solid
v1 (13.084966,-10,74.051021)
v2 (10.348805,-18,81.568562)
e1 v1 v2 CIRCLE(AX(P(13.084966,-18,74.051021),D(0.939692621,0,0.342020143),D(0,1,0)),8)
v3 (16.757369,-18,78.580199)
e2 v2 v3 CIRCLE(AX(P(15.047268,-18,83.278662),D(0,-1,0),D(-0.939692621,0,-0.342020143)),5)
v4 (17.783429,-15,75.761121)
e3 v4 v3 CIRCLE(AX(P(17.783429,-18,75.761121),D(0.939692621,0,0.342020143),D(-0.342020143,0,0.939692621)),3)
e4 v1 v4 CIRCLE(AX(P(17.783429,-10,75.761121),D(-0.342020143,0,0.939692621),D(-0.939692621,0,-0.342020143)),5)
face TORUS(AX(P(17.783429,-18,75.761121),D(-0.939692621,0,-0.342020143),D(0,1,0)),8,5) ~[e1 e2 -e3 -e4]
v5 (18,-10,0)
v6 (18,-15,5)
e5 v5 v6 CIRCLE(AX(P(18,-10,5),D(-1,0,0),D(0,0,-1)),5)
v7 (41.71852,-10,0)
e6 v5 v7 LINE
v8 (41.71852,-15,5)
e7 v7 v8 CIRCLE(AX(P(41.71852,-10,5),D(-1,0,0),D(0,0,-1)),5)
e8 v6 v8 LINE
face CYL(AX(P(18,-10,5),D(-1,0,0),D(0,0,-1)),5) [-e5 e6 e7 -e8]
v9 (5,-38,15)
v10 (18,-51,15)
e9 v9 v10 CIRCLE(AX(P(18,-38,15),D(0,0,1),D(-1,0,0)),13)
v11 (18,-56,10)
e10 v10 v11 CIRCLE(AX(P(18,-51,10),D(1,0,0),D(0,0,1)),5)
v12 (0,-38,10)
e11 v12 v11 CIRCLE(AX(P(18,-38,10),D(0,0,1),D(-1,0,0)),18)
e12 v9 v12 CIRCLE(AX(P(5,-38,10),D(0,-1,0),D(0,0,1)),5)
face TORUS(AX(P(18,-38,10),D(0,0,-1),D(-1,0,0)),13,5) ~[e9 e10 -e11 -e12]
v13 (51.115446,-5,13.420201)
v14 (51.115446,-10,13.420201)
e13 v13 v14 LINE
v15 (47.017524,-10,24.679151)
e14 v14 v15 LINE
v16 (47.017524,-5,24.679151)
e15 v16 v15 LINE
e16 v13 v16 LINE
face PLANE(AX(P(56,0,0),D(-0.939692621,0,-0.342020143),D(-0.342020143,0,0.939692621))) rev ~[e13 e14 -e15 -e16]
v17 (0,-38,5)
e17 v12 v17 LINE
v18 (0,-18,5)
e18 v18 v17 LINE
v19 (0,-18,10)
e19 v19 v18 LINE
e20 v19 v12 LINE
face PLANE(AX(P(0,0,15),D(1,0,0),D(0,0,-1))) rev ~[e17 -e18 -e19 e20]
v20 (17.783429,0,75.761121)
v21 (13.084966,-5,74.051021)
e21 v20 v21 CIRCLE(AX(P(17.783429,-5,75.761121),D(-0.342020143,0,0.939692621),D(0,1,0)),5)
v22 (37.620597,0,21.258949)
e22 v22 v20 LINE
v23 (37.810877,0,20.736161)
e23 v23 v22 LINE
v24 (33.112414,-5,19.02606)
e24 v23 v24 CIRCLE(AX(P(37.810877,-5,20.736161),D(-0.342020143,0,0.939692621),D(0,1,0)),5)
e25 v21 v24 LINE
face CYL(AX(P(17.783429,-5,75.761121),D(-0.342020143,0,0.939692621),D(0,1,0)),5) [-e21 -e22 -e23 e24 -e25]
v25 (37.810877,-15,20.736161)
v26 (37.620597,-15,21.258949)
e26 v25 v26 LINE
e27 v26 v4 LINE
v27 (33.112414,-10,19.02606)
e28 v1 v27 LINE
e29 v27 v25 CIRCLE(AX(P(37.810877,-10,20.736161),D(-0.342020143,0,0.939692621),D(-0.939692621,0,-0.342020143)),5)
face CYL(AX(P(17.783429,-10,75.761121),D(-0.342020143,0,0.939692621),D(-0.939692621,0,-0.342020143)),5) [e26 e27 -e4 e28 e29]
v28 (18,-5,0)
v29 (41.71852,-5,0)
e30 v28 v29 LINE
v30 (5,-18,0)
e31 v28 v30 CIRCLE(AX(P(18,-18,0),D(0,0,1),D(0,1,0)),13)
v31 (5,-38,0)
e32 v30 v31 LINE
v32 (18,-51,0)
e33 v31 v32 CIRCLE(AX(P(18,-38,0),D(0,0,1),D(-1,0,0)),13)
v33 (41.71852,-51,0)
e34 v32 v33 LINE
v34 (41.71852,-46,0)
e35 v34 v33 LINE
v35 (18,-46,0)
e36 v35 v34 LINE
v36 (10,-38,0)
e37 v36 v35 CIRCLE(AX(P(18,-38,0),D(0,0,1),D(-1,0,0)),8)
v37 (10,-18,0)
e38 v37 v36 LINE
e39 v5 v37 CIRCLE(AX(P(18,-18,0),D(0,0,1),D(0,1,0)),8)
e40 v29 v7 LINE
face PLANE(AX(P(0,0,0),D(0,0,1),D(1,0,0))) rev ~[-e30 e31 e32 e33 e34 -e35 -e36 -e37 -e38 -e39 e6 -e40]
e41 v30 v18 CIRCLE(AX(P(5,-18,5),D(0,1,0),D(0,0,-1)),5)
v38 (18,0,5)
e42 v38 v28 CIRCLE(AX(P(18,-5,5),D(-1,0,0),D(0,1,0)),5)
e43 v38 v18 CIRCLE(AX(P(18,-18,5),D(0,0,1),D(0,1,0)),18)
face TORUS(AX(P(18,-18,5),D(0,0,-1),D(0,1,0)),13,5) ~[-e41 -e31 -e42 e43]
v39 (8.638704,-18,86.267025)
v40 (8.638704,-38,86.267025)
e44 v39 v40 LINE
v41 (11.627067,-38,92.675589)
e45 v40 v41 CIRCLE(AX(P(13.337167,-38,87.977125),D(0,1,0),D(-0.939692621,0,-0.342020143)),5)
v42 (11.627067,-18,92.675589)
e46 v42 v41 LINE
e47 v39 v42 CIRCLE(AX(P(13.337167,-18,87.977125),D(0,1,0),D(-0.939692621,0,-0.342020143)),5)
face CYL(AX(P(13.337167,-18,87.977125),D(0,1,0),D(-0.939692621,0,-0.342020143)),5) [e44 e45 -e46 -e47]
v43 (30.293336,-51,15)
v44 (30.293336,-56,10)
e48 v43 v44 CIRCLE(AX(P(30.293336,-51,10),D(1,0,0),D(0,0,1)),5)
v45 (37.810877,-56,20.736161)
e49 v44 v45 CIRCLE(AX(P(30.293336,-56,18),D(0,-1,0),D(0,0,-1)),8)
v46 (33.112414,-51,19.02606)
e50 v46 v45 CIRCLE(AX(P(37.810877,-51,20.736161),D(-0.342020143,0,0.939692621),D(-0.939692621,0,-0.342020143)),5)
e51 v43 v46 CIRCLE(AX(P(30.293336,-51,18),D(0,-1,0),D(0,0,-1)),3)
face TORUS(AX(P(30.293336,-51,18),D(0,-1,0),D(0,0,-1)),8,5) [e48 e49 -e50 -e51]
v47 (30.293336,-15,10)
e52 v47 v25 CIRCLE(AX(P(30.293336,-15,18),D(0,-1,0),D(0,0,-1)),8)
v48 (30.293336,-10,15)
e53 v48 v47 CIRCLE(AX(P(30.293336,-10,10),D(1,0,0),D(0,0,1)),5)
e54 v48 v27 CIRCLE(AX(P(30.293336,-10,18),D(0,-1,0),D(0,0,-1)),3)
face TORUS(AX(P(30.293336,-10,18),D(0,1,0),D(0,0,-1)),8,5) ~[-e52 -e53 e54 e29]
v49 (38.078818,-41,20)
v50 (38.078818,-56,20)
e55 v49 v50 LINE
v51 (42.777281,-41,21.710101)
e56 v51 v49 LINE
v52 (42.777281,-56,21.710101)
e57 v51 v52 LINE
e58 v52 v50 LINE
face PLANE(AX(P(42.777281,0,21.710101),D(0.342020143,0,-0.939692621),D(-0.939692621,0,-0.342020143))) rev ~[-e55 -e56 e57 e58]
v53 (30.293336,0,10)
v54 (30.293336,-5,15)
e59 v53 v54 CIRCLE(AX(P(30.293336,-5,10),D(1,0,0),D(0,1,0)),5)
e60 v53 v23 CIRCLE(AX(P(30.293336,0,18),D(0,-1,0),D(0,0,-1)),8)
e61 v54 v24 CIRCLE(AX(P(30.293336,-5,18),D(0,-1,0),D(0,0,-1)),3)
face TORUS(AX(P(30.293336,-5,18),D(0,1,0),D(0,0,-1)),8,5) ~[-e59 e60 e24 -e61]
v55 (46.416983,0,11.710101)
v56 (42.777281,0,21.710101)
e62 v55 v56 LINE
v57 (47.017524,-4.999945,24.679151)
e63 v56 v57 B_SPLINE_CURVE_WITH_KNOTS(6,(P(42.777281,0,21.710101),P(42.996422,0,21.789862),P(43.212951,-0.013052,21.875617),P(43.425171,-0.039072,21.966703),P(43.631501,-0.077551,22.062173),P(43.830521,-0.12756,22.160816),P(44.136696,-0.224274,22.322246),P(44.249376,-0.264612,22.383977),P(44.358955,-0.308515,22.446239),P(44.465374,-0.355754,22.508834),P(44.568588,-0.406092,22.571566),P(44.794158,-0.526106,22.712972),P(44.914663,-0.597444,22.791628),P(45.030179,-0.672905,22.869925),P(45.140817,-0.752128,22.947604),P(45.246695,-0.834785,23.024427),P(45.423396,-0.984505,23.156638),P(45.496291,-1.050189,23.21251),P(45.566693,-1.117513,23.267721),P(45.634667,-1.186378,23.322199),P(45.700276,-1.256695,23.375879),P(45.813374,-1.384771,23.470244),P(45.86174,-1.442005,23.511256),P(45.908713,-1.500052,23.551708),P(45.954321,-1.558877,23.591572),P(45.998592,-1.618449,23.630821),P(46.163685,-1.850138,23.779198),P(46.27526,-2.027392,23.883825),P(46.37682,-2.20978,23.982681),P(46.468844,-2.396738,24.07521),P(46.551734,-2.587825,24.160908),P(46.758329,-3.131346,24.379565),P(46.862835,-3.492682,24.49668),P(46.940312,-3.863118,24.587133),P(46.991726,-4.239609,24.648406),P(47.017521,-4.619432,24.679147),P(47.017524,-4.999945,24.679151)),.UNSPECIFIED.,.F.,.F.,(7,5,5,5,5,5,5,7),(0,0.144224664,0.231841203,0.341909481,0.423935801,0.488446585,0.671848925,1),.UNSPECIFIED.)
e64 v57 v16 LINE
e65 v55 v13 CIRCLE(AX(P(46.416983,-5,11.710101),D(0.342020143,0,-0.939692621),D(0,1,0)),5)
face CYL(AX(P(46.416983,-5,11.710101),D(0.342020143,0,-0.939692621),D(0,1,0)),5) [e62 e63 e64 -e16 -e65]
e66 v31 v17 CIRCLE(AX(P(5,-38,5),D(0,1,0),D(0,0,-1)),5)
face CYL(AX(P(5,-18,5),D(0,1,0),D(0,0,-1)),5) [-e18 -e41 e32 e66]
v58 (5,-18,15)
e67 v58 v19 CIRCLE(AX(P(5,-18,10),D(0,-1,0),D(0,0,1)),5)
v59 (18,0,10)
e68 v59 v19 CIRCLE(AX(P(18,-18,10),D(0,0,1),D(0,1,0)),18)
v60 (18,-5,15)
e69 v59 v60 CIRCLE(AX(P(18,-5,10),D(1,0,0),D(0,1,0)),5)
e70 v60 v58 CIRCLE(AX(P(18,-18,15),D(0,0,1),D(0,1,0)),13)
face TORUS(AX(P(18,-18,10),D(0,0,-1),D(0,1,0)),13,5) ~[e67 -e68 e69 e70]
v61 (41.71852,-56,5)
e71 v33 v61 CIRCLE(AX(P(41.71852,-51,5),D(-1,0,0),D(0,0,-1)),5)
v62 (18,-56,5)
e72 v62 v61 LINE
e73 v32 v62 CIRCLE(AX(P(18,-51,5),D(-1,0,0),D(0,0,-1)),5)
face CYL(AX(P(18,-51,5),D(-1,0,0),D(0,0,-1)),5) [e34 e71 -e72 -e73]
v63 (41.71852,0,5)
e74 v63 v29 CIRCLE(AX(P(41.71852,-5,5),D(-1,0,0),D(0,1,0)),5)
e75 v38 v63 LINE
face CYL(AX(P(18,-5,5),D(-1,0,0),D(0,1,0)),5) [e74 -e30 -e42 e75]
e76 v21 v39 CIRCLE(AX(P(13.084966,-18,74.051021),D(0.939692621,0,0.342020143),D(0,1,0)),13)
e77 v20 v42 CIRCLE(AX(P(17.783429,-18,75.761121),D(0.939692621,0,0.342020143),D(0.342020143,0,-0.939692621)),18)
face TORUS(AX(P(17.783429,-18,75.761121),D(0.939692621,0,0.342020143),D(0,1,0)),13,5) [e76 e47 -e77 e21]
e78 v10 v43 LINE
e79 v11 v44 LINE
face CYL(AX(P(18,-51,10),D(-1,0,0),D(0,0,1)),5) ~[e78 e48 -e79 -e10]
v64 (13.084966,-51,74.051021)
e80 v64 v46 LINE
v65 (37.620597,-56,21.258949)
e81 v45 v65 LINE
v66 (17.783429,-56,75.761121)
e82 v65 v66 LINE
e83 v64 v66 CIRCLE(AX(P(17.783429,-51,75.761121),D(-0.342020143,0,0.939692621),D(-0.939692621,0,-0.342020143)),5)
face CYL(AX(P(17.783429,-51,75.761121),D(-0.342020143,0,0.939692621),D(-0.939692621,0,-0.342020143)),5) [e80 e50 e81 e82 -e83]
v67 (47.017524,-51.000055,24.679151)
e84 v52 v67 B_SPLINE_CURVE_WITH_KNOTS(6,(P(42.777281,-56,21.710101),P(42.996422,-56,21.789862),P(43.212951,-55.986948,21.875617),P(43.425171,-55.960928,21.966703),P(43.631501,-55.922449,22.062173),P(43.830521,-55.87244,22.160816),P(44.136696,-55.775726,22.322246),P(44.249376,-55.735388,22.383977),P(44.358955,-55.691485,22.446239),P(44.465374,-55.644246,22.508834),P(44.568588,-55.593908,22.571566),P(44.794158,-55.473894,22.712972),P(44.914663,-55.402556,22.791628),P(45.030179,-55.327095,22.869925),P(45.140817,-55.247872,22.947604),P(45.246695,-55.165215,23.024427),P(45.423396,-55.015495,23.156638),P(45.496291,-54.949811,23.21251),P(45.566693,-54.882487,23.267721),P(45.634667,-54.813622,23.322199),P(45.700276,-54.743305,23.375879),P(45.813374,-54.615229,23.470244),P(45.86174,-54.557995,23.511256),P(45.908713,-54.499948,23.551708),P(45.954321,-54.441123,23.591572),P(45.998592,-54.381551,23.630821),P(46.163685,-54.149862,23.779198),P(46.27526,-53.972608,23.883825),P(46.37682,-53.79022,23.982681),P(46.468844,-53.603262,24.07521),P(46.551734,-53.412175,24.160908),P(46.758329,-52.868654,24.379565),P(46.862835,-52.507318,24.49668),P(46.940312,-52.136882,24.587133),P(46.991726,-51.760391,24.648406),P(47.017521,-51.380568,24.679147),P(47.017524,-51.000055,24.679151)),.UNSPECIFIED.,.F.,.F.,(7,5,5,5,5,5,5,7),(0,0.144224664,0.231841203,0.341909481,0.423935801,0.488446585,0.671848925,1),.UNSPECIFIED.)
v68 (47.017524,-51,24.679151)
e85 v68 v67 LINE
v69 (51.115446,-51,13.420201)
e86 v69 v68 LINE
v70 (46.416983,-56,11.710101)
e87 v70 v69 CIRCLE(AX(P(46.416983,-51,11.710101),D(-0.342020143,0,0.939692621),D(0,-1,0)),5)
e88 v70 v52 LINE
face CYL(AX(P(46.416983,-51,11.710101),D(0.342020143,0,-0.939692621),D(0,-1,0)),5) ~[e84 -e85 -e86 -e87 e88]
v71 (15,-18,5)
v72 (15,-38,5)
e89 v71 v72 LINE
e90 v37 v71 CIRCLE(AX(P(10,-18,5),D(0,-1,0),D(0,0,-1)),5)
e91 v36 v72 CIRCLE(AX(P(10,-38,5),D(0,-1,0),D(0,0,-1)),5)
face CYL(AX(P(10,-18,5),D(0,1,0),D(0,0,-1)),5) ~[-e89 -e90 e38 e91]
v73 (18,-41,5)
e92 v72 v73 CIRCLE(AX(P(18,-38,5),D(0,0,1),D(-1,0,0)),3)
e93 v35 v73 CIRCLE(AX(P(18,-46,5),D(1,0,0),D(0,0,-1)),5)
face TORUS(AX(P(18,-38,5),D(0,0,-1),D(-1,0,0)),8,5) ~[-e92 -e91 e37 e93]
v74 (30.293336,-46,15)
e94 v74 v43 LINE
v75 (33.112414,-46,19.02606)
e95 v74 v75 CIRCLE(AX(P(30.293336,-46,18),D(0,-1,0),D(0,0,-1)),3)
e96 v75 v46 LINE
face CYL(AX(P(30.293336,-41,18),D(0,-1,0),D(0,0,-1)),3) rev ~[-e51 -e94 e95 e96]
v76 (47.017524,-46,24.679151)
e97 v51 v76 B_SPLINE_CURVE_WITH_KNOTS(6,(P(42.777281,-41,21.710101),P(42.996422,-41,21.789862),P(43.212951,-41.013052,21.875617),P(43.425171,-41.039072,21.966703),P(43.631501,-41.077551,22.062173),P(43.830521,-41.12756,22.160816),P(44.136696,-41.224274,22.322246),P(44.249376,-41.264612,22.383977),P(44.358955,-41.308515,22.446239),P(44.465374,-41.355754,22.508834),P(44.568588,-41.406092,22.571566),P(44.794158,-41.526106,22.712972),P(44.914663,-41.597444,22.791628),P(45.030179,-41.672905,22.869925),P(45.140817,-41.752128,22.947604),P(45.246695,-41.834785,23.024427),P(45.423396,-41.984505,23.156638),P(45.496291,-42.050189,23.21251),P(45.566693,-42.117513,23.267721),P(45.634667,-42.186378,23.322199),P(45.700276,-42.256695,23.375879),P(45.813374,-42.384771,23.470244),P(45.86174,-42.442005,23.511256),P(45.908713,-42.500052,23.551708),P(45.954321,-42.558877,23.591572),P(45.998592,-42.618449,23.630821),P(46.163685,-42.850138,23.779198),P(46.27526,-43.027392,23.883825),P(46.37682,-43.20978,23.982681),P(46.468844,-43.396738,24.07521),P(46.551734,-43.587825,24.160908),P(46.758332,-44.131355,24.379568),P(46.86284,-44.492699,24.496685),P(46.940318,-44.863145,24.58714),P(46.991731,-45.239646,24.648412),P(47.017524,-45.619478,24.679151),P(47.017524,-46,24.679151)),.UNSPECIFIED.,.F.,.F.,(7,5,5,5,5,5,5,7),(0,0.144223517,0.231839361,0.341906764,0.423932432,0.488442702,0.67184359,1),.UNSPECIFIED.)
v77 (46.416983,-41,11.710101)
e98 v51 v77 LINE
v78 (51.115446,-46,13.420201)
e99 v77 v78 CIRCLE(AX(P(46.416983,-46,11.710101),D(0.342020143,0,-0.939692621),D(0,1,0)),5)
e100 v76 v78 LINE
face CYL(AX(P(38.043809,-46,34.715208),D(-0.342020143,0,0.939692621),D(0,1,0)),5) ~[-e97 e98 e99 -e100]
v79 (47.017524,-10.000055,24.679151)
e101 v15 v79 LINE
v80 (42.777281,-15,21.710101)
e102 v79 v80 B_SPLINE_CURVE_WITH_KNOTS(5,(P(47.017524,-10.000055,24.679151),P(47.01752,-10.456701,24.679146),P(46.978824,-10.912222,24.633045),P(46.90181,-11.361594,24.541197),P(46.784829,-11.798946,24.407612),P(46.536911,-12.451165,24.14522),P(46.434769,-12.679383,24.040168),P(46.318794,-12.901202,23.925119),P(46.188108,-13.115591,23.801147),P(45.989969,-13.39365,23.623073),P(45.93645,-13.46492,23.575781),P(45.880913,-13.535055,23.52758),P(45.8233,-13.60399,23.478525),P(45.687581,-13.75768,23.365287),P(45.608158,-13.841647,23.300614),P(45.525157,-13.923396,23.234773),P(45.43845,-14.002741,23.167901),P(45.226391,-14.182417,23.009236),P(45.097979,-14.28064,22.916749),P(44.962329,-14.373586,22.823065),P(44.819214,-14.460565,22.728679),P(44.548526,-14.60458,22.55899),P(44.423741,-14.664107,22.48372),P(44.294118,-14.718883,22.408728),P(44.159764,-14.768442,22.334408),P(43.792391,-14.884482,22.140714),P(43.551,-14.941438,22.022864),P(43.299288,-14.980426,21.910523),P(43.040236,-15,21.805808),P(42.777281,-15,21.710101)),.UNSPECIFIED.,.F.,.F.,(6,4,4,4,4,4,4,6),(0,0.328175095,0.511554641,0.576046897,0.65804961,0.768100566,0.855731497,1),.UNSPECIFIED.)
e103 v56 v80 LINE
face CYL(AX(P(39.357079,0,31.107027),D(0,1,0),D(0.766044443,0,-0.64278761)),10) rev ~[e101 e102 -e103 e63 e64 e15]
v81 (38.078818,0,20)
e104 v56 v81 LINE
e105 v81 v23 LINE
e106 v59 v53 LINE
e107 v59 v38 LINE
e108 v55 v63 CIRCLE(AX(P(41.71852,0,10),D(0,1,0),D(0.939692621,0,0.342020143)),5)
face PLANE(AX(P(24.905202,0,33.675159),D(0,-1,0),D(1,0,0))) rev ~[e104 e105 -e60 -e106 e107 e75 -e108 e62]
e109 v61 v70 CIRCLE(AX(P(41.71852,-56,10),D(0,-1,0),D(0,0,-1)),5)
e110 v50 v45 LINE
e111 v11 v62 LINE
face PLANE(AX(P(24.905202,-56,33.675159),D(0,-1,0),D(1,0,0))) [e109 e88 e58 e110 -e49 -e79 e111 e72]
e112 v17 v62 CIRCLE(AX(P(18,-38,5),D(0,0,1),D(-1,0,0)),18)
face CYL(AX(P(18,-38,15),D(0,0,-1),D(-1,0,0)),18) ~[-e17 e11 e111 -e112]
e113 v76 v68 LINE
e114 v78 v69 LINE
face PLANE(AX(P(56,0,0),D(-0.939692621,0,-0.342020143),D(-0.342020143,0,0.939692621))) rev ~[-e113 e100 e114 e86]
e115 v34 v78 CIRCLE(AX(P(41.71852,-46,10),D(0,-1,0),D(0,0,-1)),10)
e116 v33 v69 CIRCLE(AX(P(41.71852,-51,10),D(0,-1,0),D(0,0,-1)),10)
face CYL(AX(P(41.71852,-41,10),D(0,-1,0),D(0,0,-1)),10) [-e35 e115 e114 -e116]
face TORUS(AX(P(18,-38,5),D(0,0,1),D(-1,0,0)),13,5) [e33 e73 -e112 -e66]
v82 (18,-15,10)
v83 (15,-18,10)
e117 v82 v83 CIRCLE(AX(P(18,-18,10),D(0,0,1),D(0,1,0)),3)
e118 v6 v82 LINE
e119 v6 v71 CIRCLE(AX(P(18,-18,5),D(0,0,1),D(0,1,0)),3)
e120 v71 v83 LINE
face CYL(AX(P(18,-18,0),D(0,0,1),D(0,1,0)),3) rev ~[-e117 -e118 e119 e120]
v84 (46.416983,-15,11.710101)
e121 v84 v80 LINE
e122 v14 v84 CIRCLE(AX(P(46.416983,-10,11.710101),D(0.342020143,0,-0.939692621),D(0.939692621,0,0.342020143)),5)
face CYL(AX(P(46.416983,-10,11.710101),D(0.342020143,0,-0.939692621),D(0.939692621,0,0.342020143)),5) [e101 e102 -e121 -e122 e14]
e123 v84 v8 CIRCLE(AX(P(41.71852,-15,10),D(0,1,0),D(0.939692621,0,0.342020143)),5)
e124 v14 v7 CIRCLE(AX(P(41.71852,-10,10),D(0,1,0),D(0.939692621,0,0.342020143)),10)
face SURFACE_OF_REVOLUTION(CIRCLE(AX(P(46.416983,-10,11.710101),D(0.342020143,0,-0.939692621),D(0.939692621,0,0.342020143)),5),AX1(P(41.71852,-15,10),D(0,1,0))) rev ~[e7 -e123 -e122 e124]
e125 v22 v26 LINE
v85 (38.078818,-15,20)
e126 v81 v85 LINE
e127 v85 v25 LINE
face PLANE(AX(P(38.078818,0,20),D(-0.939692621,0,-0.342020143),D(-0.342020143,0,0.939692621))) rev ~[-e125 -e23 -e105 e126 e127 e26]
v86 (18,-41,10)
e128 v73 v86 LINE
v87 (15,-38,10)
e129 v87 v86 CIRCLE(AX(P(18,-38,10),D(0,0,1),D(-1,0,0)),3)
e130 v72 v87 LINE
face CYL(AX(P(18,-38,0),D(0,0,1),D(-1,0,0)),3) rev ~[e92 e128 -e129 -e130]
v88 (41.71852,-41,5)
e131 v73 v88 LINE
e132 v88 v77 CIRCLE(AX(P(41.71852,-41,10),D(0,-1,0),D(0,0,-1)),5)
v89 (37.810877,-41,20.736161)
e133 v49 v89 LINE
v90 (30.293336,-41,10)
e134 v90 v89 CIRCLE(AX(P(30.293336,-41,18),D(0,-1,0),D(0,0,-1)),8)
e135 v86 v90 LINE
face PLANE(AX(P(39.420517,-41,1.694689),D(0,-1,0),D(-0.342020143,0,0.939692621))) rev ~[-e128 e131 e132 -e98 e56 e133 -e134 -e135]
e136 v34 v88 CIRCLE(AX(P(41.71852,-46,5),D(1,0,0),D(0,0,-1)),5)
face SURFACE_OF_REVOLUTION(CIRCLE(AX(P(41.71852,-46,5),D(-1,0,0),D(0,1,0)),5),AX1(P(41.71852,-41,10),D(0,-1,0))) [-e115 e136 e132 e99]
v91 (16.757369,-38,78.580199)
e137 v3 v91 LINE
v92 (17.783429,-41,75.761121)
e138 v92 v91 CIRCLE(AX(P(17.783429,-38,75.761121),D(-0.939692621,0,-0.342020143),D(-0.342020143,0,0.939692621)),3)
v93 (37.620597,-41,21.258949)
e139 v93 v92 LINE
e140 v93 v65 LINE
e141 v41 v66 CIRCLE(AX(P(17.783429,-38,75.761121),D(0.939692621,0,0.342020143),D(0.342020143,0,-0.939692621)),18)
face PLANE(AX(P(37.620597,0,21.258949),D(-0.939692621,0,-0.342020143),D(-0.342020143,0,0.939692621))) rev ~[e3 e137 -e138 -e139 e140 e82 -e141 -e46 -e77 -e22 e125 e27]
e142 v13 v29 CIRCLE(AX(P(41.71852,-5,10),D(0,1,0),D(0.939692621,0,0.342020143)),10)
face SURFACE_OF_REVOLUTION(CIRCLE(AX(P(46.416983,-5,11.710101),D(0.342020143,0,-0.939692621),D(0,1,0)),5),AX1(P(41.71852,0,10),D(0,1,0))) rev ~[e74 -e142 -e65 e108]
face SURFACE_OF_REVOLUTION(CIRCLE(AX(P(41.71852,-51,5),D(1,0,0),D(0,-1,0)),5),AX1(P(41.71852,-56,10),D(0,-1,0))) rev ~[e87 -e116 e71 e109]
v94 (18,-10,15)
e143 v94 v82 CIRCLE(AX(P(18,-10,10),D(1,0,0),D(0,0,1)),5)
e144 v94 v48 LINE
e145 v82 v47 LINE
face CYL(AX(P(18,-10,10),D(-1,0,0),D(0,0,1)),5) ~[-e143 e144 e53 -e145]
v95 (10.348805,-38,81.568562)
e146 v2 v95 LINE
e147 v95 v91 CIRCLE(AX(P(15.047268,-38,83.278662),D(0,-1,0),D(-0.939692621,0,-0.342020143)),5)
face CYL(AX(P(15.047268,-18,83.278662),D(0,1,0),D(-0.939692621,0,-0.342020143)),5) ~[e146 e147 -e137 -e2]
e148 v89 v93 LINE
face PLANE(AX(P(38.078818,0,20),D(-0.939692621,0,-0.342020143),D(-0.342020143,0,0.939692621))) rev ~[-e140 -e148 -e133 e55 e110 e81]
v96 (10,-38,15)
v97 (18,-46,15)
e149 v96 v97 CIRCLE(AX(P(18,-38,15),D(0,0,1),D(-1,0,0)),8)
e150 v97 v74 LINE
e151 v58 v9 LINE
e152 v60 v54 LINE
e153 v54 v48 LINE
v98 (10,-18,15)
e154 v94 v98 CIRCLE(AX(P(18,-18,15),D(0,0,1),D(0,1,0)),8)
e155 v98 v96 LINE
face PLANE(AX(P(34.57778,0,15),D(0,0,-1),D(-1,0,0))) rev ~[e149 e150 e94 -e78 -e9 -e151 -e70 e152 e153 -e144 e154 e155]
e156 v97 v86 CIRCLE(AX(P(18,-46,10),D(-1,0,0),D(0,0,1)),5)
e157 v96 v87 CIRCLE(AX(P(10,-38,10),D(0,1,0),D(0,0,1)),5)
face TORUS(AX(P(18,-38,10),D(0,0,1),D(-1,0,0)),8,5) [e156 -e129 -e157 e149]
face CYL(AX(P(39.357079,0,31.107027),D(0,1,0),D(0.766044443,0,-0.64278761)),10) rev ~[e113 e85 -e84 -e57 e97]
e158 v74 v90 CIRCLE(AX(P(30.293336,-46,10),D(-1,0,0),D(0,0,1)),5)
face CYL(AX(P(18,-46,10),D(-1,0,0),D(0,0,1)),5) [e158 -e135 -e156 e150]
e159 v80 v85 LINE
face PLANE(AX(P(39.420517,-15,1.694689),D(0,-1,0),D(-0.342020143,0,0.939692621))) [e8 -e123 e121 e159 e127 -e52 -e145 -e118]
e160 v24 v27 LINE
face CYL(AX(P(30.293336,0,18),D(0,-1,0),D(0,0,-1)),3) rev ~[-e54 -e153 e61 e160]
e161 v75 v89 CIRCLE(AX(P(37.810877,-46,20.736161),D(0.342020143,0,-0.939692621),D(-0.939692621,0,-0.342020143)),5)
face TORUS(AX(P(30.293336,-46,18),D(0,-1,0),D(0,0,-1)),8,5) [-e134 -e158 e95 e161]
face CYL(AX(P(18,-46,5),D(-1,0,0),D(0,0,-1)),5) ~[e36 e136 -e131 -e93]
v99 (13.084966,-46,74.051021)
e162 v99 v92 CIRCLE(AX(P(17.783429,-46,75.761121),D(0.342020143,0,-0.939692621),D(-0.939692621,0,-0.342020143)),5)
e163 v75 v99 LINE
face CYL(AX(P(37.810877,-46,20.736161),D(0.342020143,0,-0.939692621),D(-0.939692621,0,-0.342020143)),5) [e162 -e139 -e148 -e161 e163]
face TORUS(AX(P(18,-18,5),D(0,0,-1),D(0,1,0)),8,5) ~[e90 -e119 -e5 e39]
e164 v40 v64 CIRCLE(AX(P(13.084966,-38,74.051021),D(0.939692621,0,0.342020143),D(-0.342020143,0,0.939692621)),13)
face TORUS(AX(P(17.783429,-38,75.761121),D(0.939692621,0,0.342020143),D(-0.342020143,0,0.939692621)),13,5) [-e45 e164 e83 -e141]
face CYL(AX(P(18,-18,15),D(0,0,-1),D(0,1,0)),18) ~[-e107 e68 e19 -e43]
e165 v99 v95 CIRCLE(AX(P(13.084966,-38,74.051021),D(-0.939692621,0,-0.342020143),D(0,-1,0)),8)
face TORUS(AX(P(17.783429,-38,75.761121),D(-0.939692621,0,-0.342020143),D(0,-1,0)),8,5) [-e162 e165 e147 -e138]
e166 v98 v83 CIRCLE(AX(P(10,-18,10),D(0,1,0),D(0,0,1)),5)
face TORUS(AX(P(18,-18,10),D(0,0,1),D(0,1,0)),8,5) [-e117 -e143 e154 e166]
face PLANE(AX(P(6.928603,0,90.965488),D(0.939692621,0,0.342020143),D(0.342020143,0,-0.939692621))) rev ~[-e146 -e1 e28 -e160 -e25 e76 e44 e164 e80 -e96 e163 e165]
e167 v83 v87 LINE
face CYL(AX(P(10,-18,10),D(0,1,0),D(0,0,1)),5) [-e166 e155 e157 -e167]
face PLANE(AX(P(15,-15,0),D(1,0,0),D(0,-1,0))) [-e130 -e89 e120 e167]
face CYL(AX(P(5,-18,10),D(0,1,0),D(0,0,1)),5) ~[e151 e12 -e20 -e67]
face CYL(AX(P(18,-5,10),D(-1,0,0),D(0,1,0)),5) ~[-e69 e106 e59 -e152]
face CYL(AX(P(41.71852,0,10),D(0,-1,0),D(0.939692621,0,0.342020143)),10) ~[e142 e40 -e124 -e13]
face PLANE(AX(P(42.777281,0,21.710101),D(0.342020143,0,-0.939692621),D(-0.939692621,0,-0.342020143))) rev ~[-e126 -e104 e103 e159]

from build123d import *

# Parameters (mm, degrees)
F1_DEPTH     = 56
F2_W         = 41
F2_H         = 26
F3_DEPTH     = 15
F4_W         = 26
F4_H         = 80
F5_DEPTH     = 15
F6_R         = 10
F7_R         = 18
F8_R         = 3
F9_T1_DEPTH  = 58.556339633
F9_T3_DEPTH  = 12.2933358786
F9_T5_DEPTH  = 23.7185199326
F9_T7_DEPTH  = 24.4815236869
F9_T9_DEPTH  = 20
F9_T11_DEPTH = 58.556339633
F9_T13_DEPTH = 24.4815236869
F9_T16_ANGLE = 90
F9_T18_ANGLE = 110
F9_T20_ANGLE = 110
F9_T22_ANGLE = 110
F9_T24_ANGLE = 90
F9_T26_ANGLE = 90
F9_T28_ANGLE = 90
F9_T30_ANGLE = 90
F9_T32_ANGLE = 110
F9_T34_ANGLE = 90
F9_T36_ANGLE = 90
F9_T38_ANGLE = 90
F9_T40_ANGLE = 90
F9_T42_ANGLE = 90
F9_T44_ANGLE = 90
F9_T46_ANGLE = 90
F9_T48_ANGLE = 110
F9_T50_ANGLE = 110
F9_T52_ANGLE = 110
F9_T54_ANGLE = 110


# Not quite as in the source:
# - a fillet or chamfer that OpenCascade refuses, or shapes differently, is made with other operations: its cross-section is extruded or revolved along the edge and cut away or added


with BuildPart() as f1:
    # F0 (on Front) → F1 (new body)
    with BuildSketch(Plane.XZ):
        with BuildLine():
            Line((37.6205974839, 21.2589493944), (11.6270665912, 92.6755885741))
            Line((11.6270665912, 92.6755885741), (6.9286034872, 90.9654878575))
            Line((6.9286034872, 90.9654878575), (34.5777798989, 15))
            Line((34.5777798989, 15), (0, 15))
            Line((0, 15), (0, 0))
            Line((0, 0), (56, 0))
            Line((56, 0), (47.0175236918, 24.6791508276))
            ThreePointArc((47.0175236918, 24.6791508276), (45.0928436241, 22.9155064816), (42.7772806938, 21.7101007166))
            Line((42.7772806938, 21.7101007166), (38.0788175899, 20))
            Line((38.0788175899, 20), (37.6205974839, 21.2589493944))
        make_face()
    extrude(amount=F1_DEPTH)

    # F2 (on face) → F3 (cut, through all)
    with BuildSketch(Plane(origin=(0, 0, 0), x_dir=(1, 0, 0), z_dir=(0, 0, -1))):
        with Locations((35.5, 28)):
            Rectangle(F2_W, F2_H)
    extrude(amount=-F3_DEPTH, mode=Mode.SUBTRACT)

    # F4 (on face) → F5 (cut, through all)
    with BuildSketch(Plane(origin=(35.3538550955, 0, 12.8677509213), x_dir=(0, -1, 0), z_dir=(-0.9396926208, 0, -0.3420201433))):
        with Locations((28, 28.1098757281)):
            Rectangle(F4_W, F4_H)
    extrude(amount=-F5_DEPTH, mode=Mode.SUBTRACT)

    # F6
    f6_edges = [f1.edges().sort_by_distance(p)[0] for p in [
        (56, -7.5, 0),
        (56, -48.5, 0),
    ]]
    fillet(f6_edges, radius=F6_R)

    # F7
    f7_edges = [f1.edges().sort_by_distance(p)[0] for p in [
        (0, -56, 7.5),
        (0, 0, 7.5),
        (9.277835, -56, 91.820538),
        (9.277835, 0, 91.820538),
    ]]
    fillet(f7_edges, radius=F7_R)

    # F8
    f8_edges = [f1.edges().sort_by_distance(p)[0] for p in [
        (15, -15, 7.5),
        (15, -41, 7.5),
        (14.408137, -15, 77.725149),
        (14.408137, -41, 77.725149),
        (34.57778, -7.5, 15),
        (34.57778, -48.5, 15),
    ]]
    fillet(f8_edges, radius=F8_R)

    # F9: fillet of radius 5 on 42 edges, made by hand

    # F9_s2 → F9_t1 (cut)
    with BuildSketch(Plane(origin=(-22.2688890284, 0, 61.183269762), x_dir=(0, 1, 0), z_dir=(0.3420201433, 0, -0.9396926208))):
        with BuildLine():
            ThreePointArc((-51, 37.622786764), (-54.5355339059, 39.0872528581), (-56, 42.622786764))
            Line((-56, 42.622786764), (-56, 37.622786764))
            Line((-56, 37.622786764), (-51, 37.622786764))
        make_face()
        with BuildLine():
            ThreePointArc((0, 42.622786764), (-1.4644660941, 39.0872528581), (-5, 37.622786764))
            Line((-5, 37.622786764), (0, 37.622786764))
            Line((0, 37.622786764), (0, 42.622786764))
        make_face()
        with BuildLine():
            ThreePointArc((-10, 37.622786764), (-13.5355339059, 39.0872528581), (-15, 42.622786764))
            Line((-15, 42.622786764), (-15, 37.622786764))
            Line((-15, 37.622786764), (-10, 37.622786764))
        make_face()
    extrude(amount=F9_T1_DEPTH, mode=Mode.SUBTRACT)

    # F9_s4 → F9_t3 (cut)
    with BuildSketch(Plane.YZ.offset(18)):
        with BuildLine():
            ThreePointArc((-10, 15), (-13.5355339059, 13.5355339059), (-15, 10))
            Line((-15, 10), (-15, 15))
            Line((-15, 15), (-10, 15))
        make_face()
        with BuildLine():
            ThreePointArc((0, 10), (-1.4644660941, 13.5355339059), (-5, 15))
            Line((-5, 15), (0, 15))
            Line((0, 15), (0, 10))
        make_face()
        with BuildLine():
            ThreePointArc((-51, 15), (-54.5355339059, 13.5355339059), (-56, 10))
            Line((-56, 10), (-56, 15))
            Line((-56, 15), (-51, 15))
        make_face()
        with BuildLine():
            ThreePointArc((-46, 15), (-42.4644660941, 13.5355339059), (-41, 10))
            Line((-41, 10), (-41, 15))
            Line((-41, 15), (-46, 15))
        make_face()
    extrude(amount=F9_T3_DEPTH, mode=Mode.SUBTRACT)

    # F9_s6 → F9_t5 (cut)
    with BuildSketch(Plane.YZ.offset(18)):
        with BuildLine():
            ThreePointArc((0, 5), (-1.4644660941, 1.4644660941), (-5, 0))
            Line((-5, 0), (0, 0))
            Line((0, 0), (0, 5))
        make_face()
        with BuildLine():
            ThreePointArc((-10, 0), (-13.5355339059, 1.4644660941), (-15, 5))
            Line((-15, 5), (-15, 0))
            Line((-15, 0), (-10, 0))
        make_face()
        with BuildLine():
            ThreePointArc((-46, 0), (-42.4644660941, 1.4644660941), (-41, 5))
            Line((-41, 5), (-41, 0))
            Line((-41, 0), (-46, 0))
        make_face()
        with BuildLine():
            ThreePointArc((-51, 0), (-54.5355339059, 1.4644660941), (-56, 5))
            Line((-56, 5), (-56, 0))
            Line((-56, 0), (-51, 0))
        make_face()
    extrude(amount=F9_T5_DEPTH, mode=Mode.SUBTRACT)

    # F9_s8 → F9_t7 (cut)
    with BuildSketch(Plane(origin=(1.6662017331, 0, -4.577851638), x_dir=(0, 1, 0), z_dir=(-0.3420201433, 0, 0.9396926208))):
        with BuildLine():
            ThreePointArc((0, -47.622786764), (-1.4644660941, -51.1583206699), (-5, -52.622786764))
            Line((-5, -52.622786764), (0, -52.622786764))
            Line((0, -52.622786764), (0, -47.622786764))
        make_face()
        with BuildLine():
            ThreePointArc((-10, -52.622786764), (-13.5355339059, -51.1583206699), (-15, -47.622786764))
            Line((-15, -47.622786764), (-15, -52.622786764))
            Line((-15, -52.622786764), (-10, -52.622786764))
        make_face()
        with BuildLine():
            ThreePointArc((-56, -47.622786764), (-54.5355339059, -51.1583206699), (-51, -52.622786764))
            Line((-51, -52.622786764), (-56, -52.622786764))
            Line((-56, -52.622786764), (-56, -47.622786764))
        make_face()
    extrude(amount=F9_T7_DEPTH, mode=Mode.SUBTRACT)

    # F9_s10 → F9_t9 (cut)
    with BuildSketch(Plane.XZ.offset(18)):
        with BuildLine():
            ThreePointArc((5, 15), (1.4644660941, 13.5355339059), (0, 10))
            Line((0, 10), (0, 15))
            Line((0, 15), (5, 15))
        make_face()
        with BuildLine():
            ThreePointArc((10, 15), (13.5355339059, 13.5355339059), (15, 10))
            Line((15, 10), (15, 15))
            Line((15, 15), (10, 15))
        make_face()
        with BuildLine():
            ThreePointArc((8.6387042039, 86.2670247535), (8.8056283726, 90.0902167789), (11.6270665912, 92.6755885741))
            Line((11.6270665912, 92.6755885741), (6.9286034872, 90.9654878575))
            Line((6.9286034872, 90.9654878575), (8.6387042039, 86.2670247535))
        make_face()
        with BuildLine():
            ThreePointArc((10.3488049205, 81.5685616496), (12.9341767157, 78.7471234311), (16.7573687411, 78.5801992623))
            Line((16.7573687411, 78.5801992623), (12.0589056371, 76.8700985457))
            Line((12.0589056371, 76.8700985457), (10.3488049205, 81.5685616496))
        make_face()
        with BuildLine():
            ThreePointArc((10, 0), (13.5355339059, 1.4644660941), (15, 5))
            Line((15, 5), (15, 0))
            Line((15, 0), (10, 0))
        make_face()
        with BuildLine():
            ThreePointArc((5, 0), (1.4644660941, 1.4644660941), (0, 5))
            Line((0, 5), (0, 0))
            Line((0, 0), (5, 0))
        make_face()
    extrude(amount=F9_T9_DEPTH, mode=Mode.SUBTRACT)

    # F9_s12 → F9_t11 (cut)
    with BuildSketch(Plane(origin=(-2.2414413545, 0, 6.1583095086), x_dir=(0, 1, 0), z_dir=(-0.3420201433, 0, 0.9396926208))):
        with BuildLine():
            ThreePointArc((-46, -37.622786764), (-42.4644660941, -39.0872528581), (-41, -42.622786764))
            Line((-41, -42.622786764), (-41, -37.622786764))
            Line((-41, -37.622786764), (-46, -37.622786764))
        make_face()
    extrude(amount=F9_T11_DEPTH, mode=Mode.SUBTRACT)

    # F9_s14 → F9_t13 (cut)
    with BuildSketch(Plane(origin=(-6.7069725071, 0, 18.4272555162), x_dir=(0, 1, 0), z_dir=(0.3420201433, 0, -0.9396926208))):
        with BuildLine():
            ThreePointArc((-41, 47.622786764), (-42.4644660941, 51.1583206699), (-46, 52.622786764))
            Line((-46, 52.622786764), (-41, 52.622786764))
            Line((-41, 52.622786764), (-41, 47.622786764))
        make_face()
    extrude(amount=F9_T13_DEPTH, mode=Mode.SUBTRACT)

    # F9_s15 → F9_t16 (revolve, cut)
    with BuildSketch(Plane.XZ.offset(38)):
        with BuildLine():
            ThreePointArc((5, 0), (1.4644660941, 1.4644660941), (0, 5))
            Line((0, 5), (0, 0))
            Line((0, 0), (5, 0))
        make_face()
    revolve(axis=Axis((18, -38, 0), (0, 0, 1)), revolution_arc=F9_T16_ANGLE, mode=Mode.SUBTRACT)

    # F9_s17 → F9_t18 (revolve, cut)
    with BuildSketch(Plane(origin=(1.6662017331, 0, -4.577851638), x_dir=(0, 1, 0), z_dir=(-0.3420201433, 0, 0.9396926208))):
        with BuildLine():
            ThreePointArc((-10, -52.622786764), (-13.5355339059, -51.1583206699), (-15, -47.622786764))
            Line((-15, -47.622786764), (-15, -52.622786764))
            Line((-15, -52.622786764), (-10, -52.622786764))
        make_face()
    revolve(axis=Axis((41.7185199326, -15, 10), (0, 1, 0)), revolution_arc=F9_T18_ANGLE, mode=Mode.SUBTRACT)

    # F9_s19 → F9_t20 (revolve, cut)
    with BuildSketch(Plane.YZ.offset(30.2933358786)):
        with BuildLine():
            ThreePointArc((0, 10), (-1.4644660941, 13.5355339059), (-5, 15))
            Line((-5, 15), (0, 15))
            Line((0, 15), (0, 10))
        make_face()
    revolve(axis=Axis((30.2933358786, 0, 18), (0, -1, 0)), revolution_arc=F9_T20_ANGLE, mode=Mode.SUBTRACT)

    # F9_s21 → F9_t22 (revolve, cut)
    with BuildSketch(Plane(origin=(1.6662017331, 0, -4.577851638), x_dir=(0, 1, 0), z_dir=(-0.3420201433, 0, 0.9396926208))):
        with BuildLine():
            ThreePointArc((0, -47.622786764), (-1.4644660941, -51.1583206699), (-5, -52.622786764))
            Line((-5, -52.622786764), (0, -52.622786764))
            Line((0, -52.622786764), (0, -47.622786764))
        make_face()
    revolve(axis=Axis((41.7185199326, 0, 10), (0, 1, 0)), revolution_arc=F9_T22_ANGLE, mode=Mode.SUBTRACT)

    # F9_s23 → F9_t24 (revolve, cut)
    with BuildSketch(Plane.YZ.offset(18)):
        with BuildLine():
            ThreePointArc((-5, 15), (-1.4644660941, 13.5355339059), (0, 10))
            Line((0, 10), (0, 15))
            Line((0, 15), (-5, 15))
        make_face()
    revolve(axis=Axis((18, -18, 15), (0, 0, 1)), revolution_arc=F9_T24_ANGLE, mode=Mode.SUBTRACT)

    # F9_s25 → F9_t26 (revolve, cut)
    with BuildSketch(Plane.YZ.offset(18)):
        with BuildLine():
            ThreePointArc((-10, 15), (-13.5355339059, 13.5355339059), (-15, 10))
            Line((-15, 10), (-15, 15))
            Line((-15, 15), (-10, 15))
        make_face()
    revolve(axis=Axis((18, -18, 15), (0, 0, 1)), revolution_arc=F9_T26_ANGLE, mode=Mode.SUBTRACT)

    # F9_s27 → F9_t28 (revolve, cut)
    with BuildSketch(Plane.XZ.offset(38)):
        with BuildLine():
            ThreePointArc((5, 15), (1.4644660941, 13.5355339059), (0, 10))
            Line((0, 10), (0, 15))
            Line((0, 15), (5, 15))
        make_face()
    revolve(axis=Axis((18, -38, 15), (0, 0, 1)), revolution_arc=F9_T28_ANGLE, mode=Mode.SUBTRACT)

    # F9_s29 → F9_t30 (revolve, cut)
    with BuildSketch(Plane.XZ.offset(38)):
        with BuildLine():
            ThreePointArc((10, 15), (13.5355339059, 13.5355339059), (15, 10))
            Line((15, 10), (15, 15))
            Line((15, 15), (10, 15))
        make_face()
    revolve(axis=Axis((18, -38, 15), (0, 0, 1)), revolution_arc=F9_T30_ANGLE, mode=Mode.SUBTRACT)

    # F9_s31 → F9_t32 (revolve, cut)
    with BuildSketch(Plane.YZ.offset(30.2933358786)):
        with BuildLine():
            ThreePointArc((-10, 15), (-13.5355339059, 13.5355339059), (-15, 10))
            Line((-15, 10), (-15, 15))
            Line((-15, 15), (-10, 15))
        make_face()
    revolve(axis=Axis((30.2933358786, -15, 18), (0, -1, 0)), revolution_arc=F9_T32_ANGLE, mode=Mode.SUBTRACT)

    # F9_s33 → F9_t34 (revolve, cut)
    with BuildSketch(Plane.YZ.offset(18)):
        with BuildLine():
            ThreePointArc((0, 5), (-1.4644660941, 1.4644660941), (-5, 0))
            Line((-5, 0), (0, 0))
            Line((0, 0), (0, 5))
        make_face()
    revolve(axis=Axis((18, -18, 0), (0, 0, 1)), revolution_arc=F9_T34_ANGLE, mode=Mode.SUBTRACT)

    # F9_s35 → F9_t36 (revolve, cut)
    with BuildSketch(Plane(origin=(-22.2688890284, 0, 61.183269762), x_dir=(0, 1, 0), z_dir=(0.3420201433, 0, -0.9396926208))):
        with BuildLine():
            ThreePointArc((-5, 37.622786764), (-1.4644660941, 39.0872528581), (0, 42.622786764))
            Line((0, 42.622786764), (0, 37.622786764))
            Line((0, 37.622786764), (-5, 37.622786764))
        make_face()
    revolve(axis=Axis((13.0849660671, -18, 74.0510206833), (0.9396926208, 0, 0.3420201433)), revolution_arc=F9_T36_ANGLE, mode=Mode.SUBTRACT)

    # F9_s37 → F9_t38 (revolve, cut)
    with BuildSketch(Plane(origin=(-22.2688890284, 0, 61.183269762), x_dir=(0, 1, 0), z_dir=(0.3420201433, 0, -0.9396926208))):
        with BuildLine():
            ThreePointArc((-10, 37.622786764), (-13.5355339059, 39.0872528581), (-15, 42.622786764))
            Line((-15, 42.622786764), (-15, 37.622786764))
            Line((-15, 37.622786764), (-10, 37.622786764))
        make_face()
    revolve(axis=Axis((13.0849660671, -18, 74.0510206833), (0.9396926208, 0, 0.3420201433)), revolution_arc=F9_T38_ANGLE, mode=Mode.SUBTRACT)

    # F9_s39 → F9_t40 (revolve, cut)
    with BuildSketch(Plane.XZ.offset(38)):
        with BuildLine():
            ThreePointArc((8.6387042039, 86.2670247535), (8.8056283726, 90.0902167789), (11.6270665912, 92.6755885741))
            Line((11.6270665912, 92.6755885741), (6.9286034872, 90.9654878575))
            Line((6.9286034872, 90.9654878575), (8.6387042039, 86.2670247535))
        make_face()
    revolve(axis=Axis((13.0849660671, -38, 74.0510206833), (0.9396926208, 0, 0.3420201433)), revolution_arc=F9_T40_ANGLE, mode=Mode.SUBTRACT)

    # F9_s41 → F9_t42 (revolve, cut)
    with BuildSketch(Plane(origin=(-22.2688890284, 0, 61.183269762), x_dir=(0, 1, 0), z_dir=(0.3420201433, 0, -0.9396926208))):
        with BuildLine():
            ThreePointArc((-46, 37.622786764), (-42.4644660941, 39.0872528581), (-41, 42.622786764))
            Line((-41, 42.622786764), (-41, 37.622786764))
            Line((-41, 37.622786764), (-46, 37.622786764))
        make_face()
    revolve(axis=Axis((13.0849660671, -38, 74.0510206833), (-0.9396926208, 0, -0.3420201433)), revolution_arc=F9_T42_ANGLE, mode=Mode.SUBTRACT)

    # F9_s43 → F9_t44 (revolve, cut)
    with BuildSketch(Plane.YZ.offset(18)):
        with BuildLine():
            ThreePointArc((-10, 0), (-13.5355339059, 1.4644660941), (-15, 5))
            Line((-15, 5), (-15, 0))
            Line((-15, 0), (-10, 0))
        make_face()
    revolve(axis=Axis((18, -18, 0), (0, 0, 1)), revolution_arc=F9_T44_ANGLE, mode=Mode.SUBTRACT)

    # F9_s45 → F9_t46 (revolve, cut)
    with BuildSketch(Plane.XZ.offset(38)):
        with BuildLine():
            ThreePointArc((10, 0), (13.5355339059, 1.4644660941), (15, 5))
            Line((15, 5), (15, 0))
            Line((15, 0), (10, 0))
        make_face()
    revolve(axis=Axis((18, -38, 0), (0, 0, 1)), revolution_arc=F9_T46_ANGLE, mode=Mode.SUBTRACT)

    # F9_s47 → F9_t48 (revolve, cut)
    with BuildSketch(Plane.YZ.offset(30.2933358786)):
        with BuildLine():
            ThreePointArc((-56, 10), (-54.5355339059, 13.5355339059), (-51, 15))
            Line((-51, 15), (-56, 15))
            Line((-56, 15), (-56, 10))
        make_face()
    revolve(axis=Axis((30.2933358786, -56, 18), (0, -1, 0)), revolution_arc=F9_T48_ANGLE, mode=Mode.SUBTRACT)

    # F9_s49 → F9_t50 (revolve, cut)
    with BuildSketch(Plane.YZ.offset(41.7185199326)):
        with BuildLine():
            ThreePointArc((-56, 5), (-54.5355339059, 1.4644660941), (-51, 0))
            Line((-51, 0), (-56, 0))
            Line((-56, 0), (-56, 5))
        make_face()
    revolve(axis=Axis((41.7185199326, -56, 10), (0, -1, 0)), revolution_arc=F9_T50_ANGLE, mode=Mode.SUBTRACT)

    # F9_s51 → F9_t52 (revolve, cut)
    with BuildSketch(Plane.YZ.offset(30.2933358786)):
        with BuildLine():
            ThreePointArc((-46, 15), (-42.4644660941, 13.5355339059), (-41, 10))
            Line((-41, 10), (-41, 15))
            Line((-41, 15), (-46, 15))
        make_face()
    revolve(axis=Axis((30.2933358786, -41, 18), (0, -1, 0)), revolution_arc=F9_T52_ANGLE, mode=Mode.SUBTRACT)

    # F9_s53 → F9_t54 (revolve, cut)
    with BuildSketch(Plane.YZ.offset(41.7185199326)):
        with BuildLine():
            ThreePointArc((-41, 5), (-42.4644660941, 1.4644660941), (-46, 0))
            Line((-46, 0), (-41, 0))
            Line((-41, 0), (-41, 5))
        make_face()
    revolve(axis=Axis((41.7185199326, -41, 10), (0, -1, 0)), revolution_arc=F9_T54_ANGLE, mode=Mode.SUBTRACT)


solid = f1.part
